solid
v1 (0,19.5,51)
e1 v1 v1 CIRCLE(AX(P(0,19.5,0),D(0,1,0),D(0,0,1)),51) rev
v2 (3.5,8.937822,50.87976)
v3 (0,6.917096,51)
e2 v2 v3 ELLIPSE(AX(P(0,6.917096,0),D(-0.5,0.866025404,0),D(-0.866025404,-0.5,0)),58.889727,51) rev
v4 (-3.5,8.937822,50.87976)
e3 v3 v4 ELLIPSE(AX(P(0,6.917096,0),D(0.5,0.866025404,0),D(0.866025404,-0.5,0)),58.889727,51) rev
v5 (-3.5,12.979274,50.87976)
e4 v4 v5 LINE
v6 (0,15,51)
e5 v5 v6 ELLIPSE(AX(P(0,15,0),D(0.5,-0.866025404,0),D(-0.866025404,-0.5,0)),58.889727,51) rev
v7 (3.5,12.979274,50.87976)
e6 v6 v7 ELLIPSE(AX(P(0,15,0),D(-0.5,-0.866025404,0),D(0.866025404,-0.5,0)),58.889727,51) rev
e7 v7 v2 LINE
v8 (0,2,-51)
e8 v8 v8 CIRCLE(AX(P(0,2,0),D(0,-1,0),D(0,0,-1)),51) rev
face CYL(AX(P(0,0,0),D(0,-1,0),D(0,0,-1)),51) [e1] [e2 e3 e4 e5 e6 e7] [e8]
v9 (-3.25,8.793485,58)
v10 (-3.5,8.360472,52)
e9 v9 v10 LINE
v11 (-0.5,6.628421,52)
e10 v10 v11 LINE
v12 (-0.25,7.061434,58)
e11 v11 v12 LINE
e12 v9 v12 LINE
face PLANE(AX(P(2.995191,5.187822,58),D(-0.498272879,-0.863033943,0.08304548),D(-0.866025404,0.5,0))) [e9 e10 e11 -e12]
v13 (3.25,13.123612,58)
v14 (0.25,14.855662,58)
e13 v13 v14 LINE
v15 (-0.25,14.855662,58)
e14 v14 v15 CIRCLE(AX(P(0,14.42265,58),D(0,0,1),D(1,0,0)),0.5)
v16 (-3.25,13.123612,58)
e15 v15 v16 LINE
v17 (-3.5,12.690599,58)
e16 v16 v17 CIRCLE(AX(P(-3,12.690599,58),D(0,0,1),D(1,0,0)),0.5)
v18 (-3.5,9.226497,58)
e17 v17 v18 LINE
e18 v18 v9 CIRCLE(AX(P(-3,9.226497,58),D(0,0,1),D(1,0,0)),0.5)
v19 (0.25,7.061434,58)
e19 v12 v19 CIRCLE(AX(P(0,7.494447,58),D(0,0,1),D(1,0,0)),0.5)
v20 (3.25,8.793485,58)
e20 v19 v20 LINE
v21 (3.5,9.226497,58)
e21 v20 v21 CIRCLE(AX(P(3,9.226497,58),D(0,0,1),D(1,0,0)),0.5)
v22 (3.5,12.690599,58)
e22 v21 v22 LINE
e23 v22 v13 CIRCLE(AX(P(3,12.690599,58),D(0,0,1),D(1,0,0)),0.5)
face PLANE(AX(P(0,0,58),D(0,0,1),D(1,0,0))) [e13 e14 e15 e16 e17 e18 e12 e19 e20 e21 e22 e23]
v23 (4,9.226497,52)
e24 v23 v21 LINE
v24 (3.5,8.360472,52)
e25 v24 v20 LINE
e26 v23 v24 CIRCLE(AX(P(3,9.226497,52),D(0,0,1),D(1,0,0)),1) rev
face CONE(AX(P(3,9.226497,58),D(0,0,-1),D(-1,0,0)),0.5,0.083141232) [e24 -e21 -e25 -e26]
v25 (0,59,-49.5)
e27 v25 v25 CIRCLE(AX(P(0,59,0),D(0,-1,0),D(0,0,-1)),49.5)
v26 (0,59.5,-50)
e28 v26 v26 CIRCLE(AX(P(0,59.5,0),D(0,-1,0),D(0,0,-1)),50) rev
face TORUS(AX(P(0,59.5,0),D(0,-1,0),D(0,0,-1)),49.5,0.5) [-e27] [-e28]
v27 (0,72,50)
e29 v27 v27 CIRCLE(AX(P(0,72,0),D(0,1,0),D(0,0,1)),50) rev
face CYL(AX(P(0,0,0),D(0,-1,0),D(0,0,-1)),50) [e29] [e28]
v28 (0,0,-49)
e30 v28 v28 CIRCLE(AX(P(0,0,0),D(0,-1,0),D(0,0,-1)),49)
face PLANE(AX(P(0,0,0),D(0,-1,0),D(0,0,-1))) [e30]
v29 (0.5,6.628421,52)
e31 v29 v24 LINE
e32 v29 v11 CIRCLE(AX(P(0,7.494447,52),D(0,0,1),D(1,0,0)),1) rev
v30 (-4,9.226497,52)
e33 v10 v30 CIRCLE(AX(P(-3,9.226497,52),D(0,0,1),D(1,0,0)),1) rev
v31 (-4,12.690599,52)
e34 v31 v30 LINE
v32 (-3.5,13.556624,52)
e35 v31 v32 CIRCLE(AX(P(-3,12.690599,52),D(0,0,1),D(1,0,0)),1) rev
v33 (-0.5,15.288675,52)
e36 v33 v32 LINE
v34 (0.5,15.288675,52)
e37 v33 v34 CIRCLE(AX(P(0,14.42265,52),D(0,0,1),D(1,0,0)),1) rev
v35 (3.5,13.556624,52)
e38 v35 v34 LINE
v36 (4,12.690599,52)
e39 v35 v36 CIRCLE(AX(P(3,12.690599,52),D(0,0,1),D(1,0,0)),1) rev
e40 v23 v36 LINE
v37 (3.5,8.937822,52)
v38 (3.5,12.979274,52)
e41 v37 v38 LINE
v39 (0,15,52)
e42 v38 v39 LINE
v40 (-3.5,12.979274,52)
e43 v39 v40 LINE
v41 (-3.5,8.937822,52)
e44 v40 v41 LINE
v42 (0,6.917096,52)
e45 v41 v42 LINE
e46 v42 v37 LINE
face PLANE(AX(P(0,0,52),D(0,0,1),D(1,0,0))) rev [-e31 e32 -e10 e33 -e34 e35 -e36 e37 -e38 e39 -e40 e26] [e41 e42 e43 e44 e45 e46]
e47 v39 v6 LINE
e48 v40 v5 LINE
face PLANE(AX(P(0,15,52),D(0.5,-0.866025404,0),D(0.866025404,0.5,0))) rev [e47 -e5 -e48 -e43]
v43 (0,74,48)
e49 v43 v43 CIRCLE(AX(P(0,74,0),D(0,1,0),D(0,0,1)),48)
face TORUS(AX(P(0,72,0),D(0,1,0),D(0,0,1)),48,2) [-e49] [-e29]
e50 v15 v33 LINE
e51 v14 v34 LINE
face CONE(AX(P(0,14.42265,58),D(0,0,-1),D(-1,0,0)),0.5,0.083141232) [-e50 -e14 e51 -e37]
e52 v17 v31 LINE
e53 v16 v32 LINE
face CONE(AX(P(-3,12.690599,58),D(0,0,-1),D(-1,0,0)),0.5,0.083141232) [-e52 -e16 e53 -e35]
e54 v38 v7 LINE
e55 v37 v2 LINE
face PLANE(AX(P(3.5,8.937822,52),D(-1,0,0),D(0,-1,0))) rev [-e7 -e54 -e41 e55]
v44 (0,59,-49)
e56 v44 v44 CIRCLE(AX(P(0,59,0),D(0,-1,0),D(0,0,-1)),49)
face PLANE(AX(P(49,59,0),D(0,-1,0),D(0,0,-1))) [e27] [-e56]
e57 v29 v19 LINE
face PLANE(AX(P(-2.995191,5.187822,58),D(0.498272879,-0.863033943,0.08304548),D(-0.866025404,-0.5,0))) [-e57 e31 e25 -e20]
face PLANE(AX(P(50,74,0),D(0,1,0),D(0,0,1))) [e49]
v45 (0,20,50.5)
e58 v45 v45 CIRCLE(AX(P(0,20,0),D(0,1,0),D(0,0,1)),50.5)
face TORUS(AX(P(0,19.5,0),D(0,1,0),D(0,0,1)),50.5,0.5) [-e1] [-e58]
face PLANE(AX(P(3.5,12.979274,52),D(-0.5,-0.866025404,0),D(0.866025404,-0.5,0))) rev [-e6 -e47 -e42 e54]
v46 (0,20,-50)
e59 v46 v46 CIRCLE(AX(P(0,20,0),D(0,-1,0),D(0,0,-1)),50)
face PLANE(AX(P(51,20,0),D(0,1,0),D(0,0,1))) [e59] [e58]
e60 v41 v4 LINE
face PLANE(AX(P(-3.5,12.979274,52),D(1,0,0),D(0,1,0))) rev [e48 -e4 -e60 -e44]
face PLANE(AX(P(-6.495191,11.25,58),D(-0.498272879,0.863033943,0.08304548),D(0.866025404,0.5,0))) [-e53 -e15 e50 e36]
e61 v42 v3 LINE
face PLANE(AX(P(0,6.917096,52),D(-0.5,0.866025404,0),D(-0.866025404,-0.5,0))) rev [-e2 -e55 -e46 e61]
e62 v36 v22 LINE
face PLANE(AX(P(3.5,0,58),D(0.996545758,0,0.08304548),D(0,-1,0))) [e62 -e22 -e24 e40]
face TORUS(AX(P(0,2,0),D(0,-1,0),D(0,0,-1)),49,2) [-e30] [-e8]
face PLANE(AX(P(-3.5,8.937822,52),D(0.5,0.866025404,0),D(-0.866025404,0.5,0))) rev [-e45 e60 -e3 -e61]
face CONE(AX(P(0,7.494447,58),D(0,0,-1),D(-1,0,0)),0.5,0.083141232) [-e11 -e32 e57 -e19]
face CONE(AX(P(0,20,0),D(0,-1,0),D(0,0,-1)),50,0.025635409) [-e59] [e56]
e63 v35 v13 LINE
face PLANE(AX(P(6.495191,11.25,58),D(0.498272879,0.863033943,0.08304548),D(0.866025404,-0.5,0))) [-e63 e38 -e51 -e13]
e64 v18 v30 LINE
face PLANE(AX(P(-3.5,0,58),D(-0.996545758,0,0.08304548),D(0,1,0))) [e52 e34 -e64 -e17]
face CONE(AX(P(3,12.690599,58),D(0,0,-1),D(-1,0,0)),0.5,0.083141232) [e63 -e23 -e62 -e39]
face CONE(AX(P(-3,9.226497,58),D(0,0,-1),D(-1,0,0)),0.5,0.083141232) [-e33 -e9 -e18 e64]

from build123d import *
from OCP.BRepFilletAPI import BRepFilletAPI_MakeChamfer

# Parameters (mm, degrees)
FILLET_1_R       = 2
FILLET_2_R       = 0.5
EXTRUDE_1_DEPTH  = 52
EXTRUDE_2_DEPTH  = 6
FILLET_3_R       = 1
CHAMFER_1_SIZE   = 6
CHAMFER_1_SIZE_2 = 0.5


with BuildPart() as part:
    # 스케치1 → 회전1 (revolve)
    with BuildSketch(Plane.XY, mode=Mode.PRIVATE) as revolve_1_sk:
        Polygon((0, 0), (51, 0), (51, 20), (50, 20), (49, 59), (50, 59), (50, 74), (0, 74), align=None)
    revolve(revolve_1_sk.sketch.rotate(Axis((0, 0, 0), (0, 1, 0)), 90), axis=Axis((0, 0, 0), (0, 1, 0)))

    # 필렛1
    fillet_1_edges = [part.edges().sort_by_distance(p)[0] for p in [
        (0, 74, 50),
        (0, 0, 51),
    ]]
    fillet(fillet_1_edges, radius=FILLET_1_R)

    # 필렛2
    fillet_2_edges = [part.edges().sort_by_distance(p)[0] for p in [
        (0, 59, 50),
        (0, 20, 51),
    ]]
    fillet(fillet_2_edges, radius=FILLET_2_R)

    # 스케치2 → 보스-돌출1 (add)
    with BuildSketch(Plane.XY):
        Polygon((0, 6.917096231), (3.5, 8.937822174), (3.5, 12.979274058), (0, 15), (-3.5, 12.979274058), (-3.5, 8.937822174), align=None)
    extrude(amount=EXTRUDE_1_DEPTH)

    # 스케치3 → 보스-돌출2 (add)
    with BuildSketch(Plane.XY.offset(52)):
        Polygon((-4, 8.649147039), (0, 6.339745962), (4, 8.649147039), (4, 13.267949192), (0, 15.577350269), (-4, 13.267949192), align=None)
    extrude(amount=EXTRUDE_2_DEPTH)

    # 필렛3
    fillet_3_edges = [part.edges().sort_by_distance(p)[0] for p in [
        (-4, 13.267949192, 55),
        (-4, 8.649147039, 55),
        (0, 6.339745962, 55),
        (4, 8.649147039, 55),
        (4, 13.267949192, 55),
        (0, 15.577350269, 55),
    ]]
    fillet(fillet_3_edges, radius=FILLET_3_R)

    # 모따기1
    chamfer_1_edges_1 = [part.edges().sort_by_distance(p)[0] for p in [
        (-2, 7.494446501, 58),
    ]]
    chamfer_1_side_1 = [part.faces().sort_by_distance(p)[0] for p in [
        (-2, 7.494446501, 57.99),
    ]]
    chamfer_1_edges_2 = [part.edges().sort_by_distance(p)[0] for p in [
        (0, 6.494446501, 58),
    ]]
    chamfer_1_side_2 = [part.faces().sort_by_distance(p)[0] for p in [
        (0, 6.494446501, 57.99),
    ]]
    chamfer_1_edges_3 = [part.edges().sort_by_distance(p)[0] for p in [
        (-3.866025404, 8.726497308, 58),
    ]]
    chamfer_1_side_3 = [part.faces().sort_by_distance(p)[0] for p in [
        (-3.866025404, 8.726497308, 57.99),
    ]]
    chamfer_1_edges_4 = [part.edges().sort_by_distance(p)[0] for p in [
        (2, 7.494446501, 58),
    ]]
    chamfer_1_side_4 = [part.faces().sort_by_distance(p)[0] for p in [
        (1.995, 7.503106755, 58),
    ]]
    chamfer_1_edges_5 = [part.edges().sort_by_distance(p)[0] for p in [
        (-4, 10.958548116, 58),
    ]]
    chamfer_1_side_5 = [part.faces().sort_by_distance(p)[0] for p in [
        (-3.99, 10.958548116, 58),
    ]]
    chamfer_1_edges_6 = [part.edges().sort_by_distance(p)[0] for p in [
        (3.866025404, 8.726497308, 58),
    ]]
    chamfer_1_side_6 = [part.faces().sort_by_distance(p)[0] for p in [
        (3.85736515, 8.731497308, 58),
    ]]
    chamfer_1_edges_7 = [part.edges().sort_by_distance(p)[0] for p in [
        (-3.866025404, 13.190598923, 58),
    ]]
    chamfer_1_side_7 = [part.faces().sort_by_distance(p)[0] for p in [
        (-3.85736515, 13.185598923, 58),
    ]]
    chamfer_1_edges_8 = [part.edges().sort_by_distance(p)[0] for p in [
        (4, 10.958548116, 58),
    ]]
    chamfer_1_side_8 = [part.faces().sort_by_distance(p)[0] for p in [
        (3.99, 10.958548116, 58),
    ]]
    chamfer_1_edges_9 = [part.edges().sort_by_distance(p)[0] for p in [
        (-2, 14.422649731, 58),
    ]]
    chamfer_1_side_9 = [part.faces().sort_by_distance(p)[0] for p in [
        (-1.995, 14.413989477, 58),
    ]]
    chamfer_1_edges_10 = [part.edges().sort_by_distance(p)[0] for p in [
        (3.866025404, 13.190598923, 58),
    ]]
    chamfer_1_side_10 = [part.faces().sort_by_distance(p)[0] for p in [
        (3.85736515, 13.185598923, 58),
    ]]
    chamfer_1_edges_11 = [part.edges().sort_by_distance(p)[0] for p in [
        (0, 15.422649731, 58),
    ]]
    chamfer_1_side_11 = [part.faces().sort_by_distance(p)[0] for p in [
        (0, 15.412649731, 58),
    ]]
    chamfer_1_edges_12 = [part.edges().sort_by_distance(p)[0] for p in [
        (2, 14.422649731, 58),
    ]]
    chamfer_1_side_12 = [part.faces().sort_by_distance(p)[0] for p in [
        (1.995, 14.413989477, 58),
    ]]
    chamfer_1 = BRepFilletAPI_MakeChamfer(part.part.solid().wrapped)
    for e in chamfer_1_edges_1:
        chamfer_1.Add(CHAMFER_1_SIZE - 0.0001, CHAMFER_1_SIZE_2 - 0.0001, e.wrapped, chamfer_1_side_1[0].wrapped)
    for e in chamfer_1_edges_2:
        chamfer_1.Add(CHAMFER_1_SIZE - 0.0001, CHAMFER_1_SIZE_2 - 0.0001, e.wrapped, chamfer_1_side_2[0].wrapped)
    for e in chamfer_1_edges_3:
        chamfer_1.Add(CHAMFER_1_SIZE - 0.0001, CHAMFER_1_SIZE_2 - 0.0001, e.wrapped, chamfer_1_side_3[0].wrapped)
    for e in chamfer_1_edges_4:
        chamfer_1.Add(CHAMFER_1_SIZE_2 - 0.0001, CHAMFER_1_SIZE - 0.0001, e.wrapped, chamfer_1_side_4[0].wrapped)
    for e in chamfer_1_edges_5:
        chamfer_1.Add(CHAMFER_1_SIZE_2 - 0.0001, CHAMFER_1_SIZE - 0.0001, e.wrapped, chamfer_1_side_5[0].wrapped)
    for e in chamfer_1_edges_6:
        chamfer_1.Add(CHAMFER_1_SIZE_2 - 0.0001, CHAMFER_1_SIZE - 0.0001, e.wrapped, chamfer_1_side_6[0].wrapped)
    for e in chamfer_1_edges_7:
        chamfer_1.Add(CHAMFER_1_SIZE_2 - 0.0001, CHAMFER_1_SIZE - 0.0001, e.wrapped, chamfer_1_side_7[0].wrapped)
    for e in chamfer_1_edges_8:
        chamfer_1.Add(CHAMFER_1_SIZE_2 - 0.0001, CHAMFER_1_SIZE - 0.0001, e.wrapped, chamfer_1_side_8[0].wrapped)
    for e in chamfer_1_edges_9:
        chamfer_1.Add(CHAMFER_1_SIZE_2 - 0.0001, CHAMFER_1_SIZE - 0.0001, e.wrapped, chamfer_1_side_9[0].wrapped)
    for e in chamfer_1_edges_10:
        chamfer_1.Add(CHAMFER_1_SIZE_2 - 0.0001, CHAMFER_1_SIZE - 0.0001, e.wrapped, chamfer_1_side_10[0].wrapped)
    for e in chamfer_1_edges_11:
        chamfer_1.Add(CHAMFER_1_SIZE_2 - 0.0001, CHAMFER_1_SIZE - 0.0001, e.wrapped, chamfer_1_side_11[0].wrapped)
    for e in chamfer_1_edges_12:
        chamfer_1.Add(CHAMFER_1_SIZE_2 - 0.0001, CHAMFER_1_SIZE - 0.0001, e.wrapped, chamfer_1_side_12[0].wrapped)
    add(Compound.cast(chamfer_1.Shape()), mode=Mode.REPLACE)  # a hair under: the kernel refuses the full size


solid = part.part
